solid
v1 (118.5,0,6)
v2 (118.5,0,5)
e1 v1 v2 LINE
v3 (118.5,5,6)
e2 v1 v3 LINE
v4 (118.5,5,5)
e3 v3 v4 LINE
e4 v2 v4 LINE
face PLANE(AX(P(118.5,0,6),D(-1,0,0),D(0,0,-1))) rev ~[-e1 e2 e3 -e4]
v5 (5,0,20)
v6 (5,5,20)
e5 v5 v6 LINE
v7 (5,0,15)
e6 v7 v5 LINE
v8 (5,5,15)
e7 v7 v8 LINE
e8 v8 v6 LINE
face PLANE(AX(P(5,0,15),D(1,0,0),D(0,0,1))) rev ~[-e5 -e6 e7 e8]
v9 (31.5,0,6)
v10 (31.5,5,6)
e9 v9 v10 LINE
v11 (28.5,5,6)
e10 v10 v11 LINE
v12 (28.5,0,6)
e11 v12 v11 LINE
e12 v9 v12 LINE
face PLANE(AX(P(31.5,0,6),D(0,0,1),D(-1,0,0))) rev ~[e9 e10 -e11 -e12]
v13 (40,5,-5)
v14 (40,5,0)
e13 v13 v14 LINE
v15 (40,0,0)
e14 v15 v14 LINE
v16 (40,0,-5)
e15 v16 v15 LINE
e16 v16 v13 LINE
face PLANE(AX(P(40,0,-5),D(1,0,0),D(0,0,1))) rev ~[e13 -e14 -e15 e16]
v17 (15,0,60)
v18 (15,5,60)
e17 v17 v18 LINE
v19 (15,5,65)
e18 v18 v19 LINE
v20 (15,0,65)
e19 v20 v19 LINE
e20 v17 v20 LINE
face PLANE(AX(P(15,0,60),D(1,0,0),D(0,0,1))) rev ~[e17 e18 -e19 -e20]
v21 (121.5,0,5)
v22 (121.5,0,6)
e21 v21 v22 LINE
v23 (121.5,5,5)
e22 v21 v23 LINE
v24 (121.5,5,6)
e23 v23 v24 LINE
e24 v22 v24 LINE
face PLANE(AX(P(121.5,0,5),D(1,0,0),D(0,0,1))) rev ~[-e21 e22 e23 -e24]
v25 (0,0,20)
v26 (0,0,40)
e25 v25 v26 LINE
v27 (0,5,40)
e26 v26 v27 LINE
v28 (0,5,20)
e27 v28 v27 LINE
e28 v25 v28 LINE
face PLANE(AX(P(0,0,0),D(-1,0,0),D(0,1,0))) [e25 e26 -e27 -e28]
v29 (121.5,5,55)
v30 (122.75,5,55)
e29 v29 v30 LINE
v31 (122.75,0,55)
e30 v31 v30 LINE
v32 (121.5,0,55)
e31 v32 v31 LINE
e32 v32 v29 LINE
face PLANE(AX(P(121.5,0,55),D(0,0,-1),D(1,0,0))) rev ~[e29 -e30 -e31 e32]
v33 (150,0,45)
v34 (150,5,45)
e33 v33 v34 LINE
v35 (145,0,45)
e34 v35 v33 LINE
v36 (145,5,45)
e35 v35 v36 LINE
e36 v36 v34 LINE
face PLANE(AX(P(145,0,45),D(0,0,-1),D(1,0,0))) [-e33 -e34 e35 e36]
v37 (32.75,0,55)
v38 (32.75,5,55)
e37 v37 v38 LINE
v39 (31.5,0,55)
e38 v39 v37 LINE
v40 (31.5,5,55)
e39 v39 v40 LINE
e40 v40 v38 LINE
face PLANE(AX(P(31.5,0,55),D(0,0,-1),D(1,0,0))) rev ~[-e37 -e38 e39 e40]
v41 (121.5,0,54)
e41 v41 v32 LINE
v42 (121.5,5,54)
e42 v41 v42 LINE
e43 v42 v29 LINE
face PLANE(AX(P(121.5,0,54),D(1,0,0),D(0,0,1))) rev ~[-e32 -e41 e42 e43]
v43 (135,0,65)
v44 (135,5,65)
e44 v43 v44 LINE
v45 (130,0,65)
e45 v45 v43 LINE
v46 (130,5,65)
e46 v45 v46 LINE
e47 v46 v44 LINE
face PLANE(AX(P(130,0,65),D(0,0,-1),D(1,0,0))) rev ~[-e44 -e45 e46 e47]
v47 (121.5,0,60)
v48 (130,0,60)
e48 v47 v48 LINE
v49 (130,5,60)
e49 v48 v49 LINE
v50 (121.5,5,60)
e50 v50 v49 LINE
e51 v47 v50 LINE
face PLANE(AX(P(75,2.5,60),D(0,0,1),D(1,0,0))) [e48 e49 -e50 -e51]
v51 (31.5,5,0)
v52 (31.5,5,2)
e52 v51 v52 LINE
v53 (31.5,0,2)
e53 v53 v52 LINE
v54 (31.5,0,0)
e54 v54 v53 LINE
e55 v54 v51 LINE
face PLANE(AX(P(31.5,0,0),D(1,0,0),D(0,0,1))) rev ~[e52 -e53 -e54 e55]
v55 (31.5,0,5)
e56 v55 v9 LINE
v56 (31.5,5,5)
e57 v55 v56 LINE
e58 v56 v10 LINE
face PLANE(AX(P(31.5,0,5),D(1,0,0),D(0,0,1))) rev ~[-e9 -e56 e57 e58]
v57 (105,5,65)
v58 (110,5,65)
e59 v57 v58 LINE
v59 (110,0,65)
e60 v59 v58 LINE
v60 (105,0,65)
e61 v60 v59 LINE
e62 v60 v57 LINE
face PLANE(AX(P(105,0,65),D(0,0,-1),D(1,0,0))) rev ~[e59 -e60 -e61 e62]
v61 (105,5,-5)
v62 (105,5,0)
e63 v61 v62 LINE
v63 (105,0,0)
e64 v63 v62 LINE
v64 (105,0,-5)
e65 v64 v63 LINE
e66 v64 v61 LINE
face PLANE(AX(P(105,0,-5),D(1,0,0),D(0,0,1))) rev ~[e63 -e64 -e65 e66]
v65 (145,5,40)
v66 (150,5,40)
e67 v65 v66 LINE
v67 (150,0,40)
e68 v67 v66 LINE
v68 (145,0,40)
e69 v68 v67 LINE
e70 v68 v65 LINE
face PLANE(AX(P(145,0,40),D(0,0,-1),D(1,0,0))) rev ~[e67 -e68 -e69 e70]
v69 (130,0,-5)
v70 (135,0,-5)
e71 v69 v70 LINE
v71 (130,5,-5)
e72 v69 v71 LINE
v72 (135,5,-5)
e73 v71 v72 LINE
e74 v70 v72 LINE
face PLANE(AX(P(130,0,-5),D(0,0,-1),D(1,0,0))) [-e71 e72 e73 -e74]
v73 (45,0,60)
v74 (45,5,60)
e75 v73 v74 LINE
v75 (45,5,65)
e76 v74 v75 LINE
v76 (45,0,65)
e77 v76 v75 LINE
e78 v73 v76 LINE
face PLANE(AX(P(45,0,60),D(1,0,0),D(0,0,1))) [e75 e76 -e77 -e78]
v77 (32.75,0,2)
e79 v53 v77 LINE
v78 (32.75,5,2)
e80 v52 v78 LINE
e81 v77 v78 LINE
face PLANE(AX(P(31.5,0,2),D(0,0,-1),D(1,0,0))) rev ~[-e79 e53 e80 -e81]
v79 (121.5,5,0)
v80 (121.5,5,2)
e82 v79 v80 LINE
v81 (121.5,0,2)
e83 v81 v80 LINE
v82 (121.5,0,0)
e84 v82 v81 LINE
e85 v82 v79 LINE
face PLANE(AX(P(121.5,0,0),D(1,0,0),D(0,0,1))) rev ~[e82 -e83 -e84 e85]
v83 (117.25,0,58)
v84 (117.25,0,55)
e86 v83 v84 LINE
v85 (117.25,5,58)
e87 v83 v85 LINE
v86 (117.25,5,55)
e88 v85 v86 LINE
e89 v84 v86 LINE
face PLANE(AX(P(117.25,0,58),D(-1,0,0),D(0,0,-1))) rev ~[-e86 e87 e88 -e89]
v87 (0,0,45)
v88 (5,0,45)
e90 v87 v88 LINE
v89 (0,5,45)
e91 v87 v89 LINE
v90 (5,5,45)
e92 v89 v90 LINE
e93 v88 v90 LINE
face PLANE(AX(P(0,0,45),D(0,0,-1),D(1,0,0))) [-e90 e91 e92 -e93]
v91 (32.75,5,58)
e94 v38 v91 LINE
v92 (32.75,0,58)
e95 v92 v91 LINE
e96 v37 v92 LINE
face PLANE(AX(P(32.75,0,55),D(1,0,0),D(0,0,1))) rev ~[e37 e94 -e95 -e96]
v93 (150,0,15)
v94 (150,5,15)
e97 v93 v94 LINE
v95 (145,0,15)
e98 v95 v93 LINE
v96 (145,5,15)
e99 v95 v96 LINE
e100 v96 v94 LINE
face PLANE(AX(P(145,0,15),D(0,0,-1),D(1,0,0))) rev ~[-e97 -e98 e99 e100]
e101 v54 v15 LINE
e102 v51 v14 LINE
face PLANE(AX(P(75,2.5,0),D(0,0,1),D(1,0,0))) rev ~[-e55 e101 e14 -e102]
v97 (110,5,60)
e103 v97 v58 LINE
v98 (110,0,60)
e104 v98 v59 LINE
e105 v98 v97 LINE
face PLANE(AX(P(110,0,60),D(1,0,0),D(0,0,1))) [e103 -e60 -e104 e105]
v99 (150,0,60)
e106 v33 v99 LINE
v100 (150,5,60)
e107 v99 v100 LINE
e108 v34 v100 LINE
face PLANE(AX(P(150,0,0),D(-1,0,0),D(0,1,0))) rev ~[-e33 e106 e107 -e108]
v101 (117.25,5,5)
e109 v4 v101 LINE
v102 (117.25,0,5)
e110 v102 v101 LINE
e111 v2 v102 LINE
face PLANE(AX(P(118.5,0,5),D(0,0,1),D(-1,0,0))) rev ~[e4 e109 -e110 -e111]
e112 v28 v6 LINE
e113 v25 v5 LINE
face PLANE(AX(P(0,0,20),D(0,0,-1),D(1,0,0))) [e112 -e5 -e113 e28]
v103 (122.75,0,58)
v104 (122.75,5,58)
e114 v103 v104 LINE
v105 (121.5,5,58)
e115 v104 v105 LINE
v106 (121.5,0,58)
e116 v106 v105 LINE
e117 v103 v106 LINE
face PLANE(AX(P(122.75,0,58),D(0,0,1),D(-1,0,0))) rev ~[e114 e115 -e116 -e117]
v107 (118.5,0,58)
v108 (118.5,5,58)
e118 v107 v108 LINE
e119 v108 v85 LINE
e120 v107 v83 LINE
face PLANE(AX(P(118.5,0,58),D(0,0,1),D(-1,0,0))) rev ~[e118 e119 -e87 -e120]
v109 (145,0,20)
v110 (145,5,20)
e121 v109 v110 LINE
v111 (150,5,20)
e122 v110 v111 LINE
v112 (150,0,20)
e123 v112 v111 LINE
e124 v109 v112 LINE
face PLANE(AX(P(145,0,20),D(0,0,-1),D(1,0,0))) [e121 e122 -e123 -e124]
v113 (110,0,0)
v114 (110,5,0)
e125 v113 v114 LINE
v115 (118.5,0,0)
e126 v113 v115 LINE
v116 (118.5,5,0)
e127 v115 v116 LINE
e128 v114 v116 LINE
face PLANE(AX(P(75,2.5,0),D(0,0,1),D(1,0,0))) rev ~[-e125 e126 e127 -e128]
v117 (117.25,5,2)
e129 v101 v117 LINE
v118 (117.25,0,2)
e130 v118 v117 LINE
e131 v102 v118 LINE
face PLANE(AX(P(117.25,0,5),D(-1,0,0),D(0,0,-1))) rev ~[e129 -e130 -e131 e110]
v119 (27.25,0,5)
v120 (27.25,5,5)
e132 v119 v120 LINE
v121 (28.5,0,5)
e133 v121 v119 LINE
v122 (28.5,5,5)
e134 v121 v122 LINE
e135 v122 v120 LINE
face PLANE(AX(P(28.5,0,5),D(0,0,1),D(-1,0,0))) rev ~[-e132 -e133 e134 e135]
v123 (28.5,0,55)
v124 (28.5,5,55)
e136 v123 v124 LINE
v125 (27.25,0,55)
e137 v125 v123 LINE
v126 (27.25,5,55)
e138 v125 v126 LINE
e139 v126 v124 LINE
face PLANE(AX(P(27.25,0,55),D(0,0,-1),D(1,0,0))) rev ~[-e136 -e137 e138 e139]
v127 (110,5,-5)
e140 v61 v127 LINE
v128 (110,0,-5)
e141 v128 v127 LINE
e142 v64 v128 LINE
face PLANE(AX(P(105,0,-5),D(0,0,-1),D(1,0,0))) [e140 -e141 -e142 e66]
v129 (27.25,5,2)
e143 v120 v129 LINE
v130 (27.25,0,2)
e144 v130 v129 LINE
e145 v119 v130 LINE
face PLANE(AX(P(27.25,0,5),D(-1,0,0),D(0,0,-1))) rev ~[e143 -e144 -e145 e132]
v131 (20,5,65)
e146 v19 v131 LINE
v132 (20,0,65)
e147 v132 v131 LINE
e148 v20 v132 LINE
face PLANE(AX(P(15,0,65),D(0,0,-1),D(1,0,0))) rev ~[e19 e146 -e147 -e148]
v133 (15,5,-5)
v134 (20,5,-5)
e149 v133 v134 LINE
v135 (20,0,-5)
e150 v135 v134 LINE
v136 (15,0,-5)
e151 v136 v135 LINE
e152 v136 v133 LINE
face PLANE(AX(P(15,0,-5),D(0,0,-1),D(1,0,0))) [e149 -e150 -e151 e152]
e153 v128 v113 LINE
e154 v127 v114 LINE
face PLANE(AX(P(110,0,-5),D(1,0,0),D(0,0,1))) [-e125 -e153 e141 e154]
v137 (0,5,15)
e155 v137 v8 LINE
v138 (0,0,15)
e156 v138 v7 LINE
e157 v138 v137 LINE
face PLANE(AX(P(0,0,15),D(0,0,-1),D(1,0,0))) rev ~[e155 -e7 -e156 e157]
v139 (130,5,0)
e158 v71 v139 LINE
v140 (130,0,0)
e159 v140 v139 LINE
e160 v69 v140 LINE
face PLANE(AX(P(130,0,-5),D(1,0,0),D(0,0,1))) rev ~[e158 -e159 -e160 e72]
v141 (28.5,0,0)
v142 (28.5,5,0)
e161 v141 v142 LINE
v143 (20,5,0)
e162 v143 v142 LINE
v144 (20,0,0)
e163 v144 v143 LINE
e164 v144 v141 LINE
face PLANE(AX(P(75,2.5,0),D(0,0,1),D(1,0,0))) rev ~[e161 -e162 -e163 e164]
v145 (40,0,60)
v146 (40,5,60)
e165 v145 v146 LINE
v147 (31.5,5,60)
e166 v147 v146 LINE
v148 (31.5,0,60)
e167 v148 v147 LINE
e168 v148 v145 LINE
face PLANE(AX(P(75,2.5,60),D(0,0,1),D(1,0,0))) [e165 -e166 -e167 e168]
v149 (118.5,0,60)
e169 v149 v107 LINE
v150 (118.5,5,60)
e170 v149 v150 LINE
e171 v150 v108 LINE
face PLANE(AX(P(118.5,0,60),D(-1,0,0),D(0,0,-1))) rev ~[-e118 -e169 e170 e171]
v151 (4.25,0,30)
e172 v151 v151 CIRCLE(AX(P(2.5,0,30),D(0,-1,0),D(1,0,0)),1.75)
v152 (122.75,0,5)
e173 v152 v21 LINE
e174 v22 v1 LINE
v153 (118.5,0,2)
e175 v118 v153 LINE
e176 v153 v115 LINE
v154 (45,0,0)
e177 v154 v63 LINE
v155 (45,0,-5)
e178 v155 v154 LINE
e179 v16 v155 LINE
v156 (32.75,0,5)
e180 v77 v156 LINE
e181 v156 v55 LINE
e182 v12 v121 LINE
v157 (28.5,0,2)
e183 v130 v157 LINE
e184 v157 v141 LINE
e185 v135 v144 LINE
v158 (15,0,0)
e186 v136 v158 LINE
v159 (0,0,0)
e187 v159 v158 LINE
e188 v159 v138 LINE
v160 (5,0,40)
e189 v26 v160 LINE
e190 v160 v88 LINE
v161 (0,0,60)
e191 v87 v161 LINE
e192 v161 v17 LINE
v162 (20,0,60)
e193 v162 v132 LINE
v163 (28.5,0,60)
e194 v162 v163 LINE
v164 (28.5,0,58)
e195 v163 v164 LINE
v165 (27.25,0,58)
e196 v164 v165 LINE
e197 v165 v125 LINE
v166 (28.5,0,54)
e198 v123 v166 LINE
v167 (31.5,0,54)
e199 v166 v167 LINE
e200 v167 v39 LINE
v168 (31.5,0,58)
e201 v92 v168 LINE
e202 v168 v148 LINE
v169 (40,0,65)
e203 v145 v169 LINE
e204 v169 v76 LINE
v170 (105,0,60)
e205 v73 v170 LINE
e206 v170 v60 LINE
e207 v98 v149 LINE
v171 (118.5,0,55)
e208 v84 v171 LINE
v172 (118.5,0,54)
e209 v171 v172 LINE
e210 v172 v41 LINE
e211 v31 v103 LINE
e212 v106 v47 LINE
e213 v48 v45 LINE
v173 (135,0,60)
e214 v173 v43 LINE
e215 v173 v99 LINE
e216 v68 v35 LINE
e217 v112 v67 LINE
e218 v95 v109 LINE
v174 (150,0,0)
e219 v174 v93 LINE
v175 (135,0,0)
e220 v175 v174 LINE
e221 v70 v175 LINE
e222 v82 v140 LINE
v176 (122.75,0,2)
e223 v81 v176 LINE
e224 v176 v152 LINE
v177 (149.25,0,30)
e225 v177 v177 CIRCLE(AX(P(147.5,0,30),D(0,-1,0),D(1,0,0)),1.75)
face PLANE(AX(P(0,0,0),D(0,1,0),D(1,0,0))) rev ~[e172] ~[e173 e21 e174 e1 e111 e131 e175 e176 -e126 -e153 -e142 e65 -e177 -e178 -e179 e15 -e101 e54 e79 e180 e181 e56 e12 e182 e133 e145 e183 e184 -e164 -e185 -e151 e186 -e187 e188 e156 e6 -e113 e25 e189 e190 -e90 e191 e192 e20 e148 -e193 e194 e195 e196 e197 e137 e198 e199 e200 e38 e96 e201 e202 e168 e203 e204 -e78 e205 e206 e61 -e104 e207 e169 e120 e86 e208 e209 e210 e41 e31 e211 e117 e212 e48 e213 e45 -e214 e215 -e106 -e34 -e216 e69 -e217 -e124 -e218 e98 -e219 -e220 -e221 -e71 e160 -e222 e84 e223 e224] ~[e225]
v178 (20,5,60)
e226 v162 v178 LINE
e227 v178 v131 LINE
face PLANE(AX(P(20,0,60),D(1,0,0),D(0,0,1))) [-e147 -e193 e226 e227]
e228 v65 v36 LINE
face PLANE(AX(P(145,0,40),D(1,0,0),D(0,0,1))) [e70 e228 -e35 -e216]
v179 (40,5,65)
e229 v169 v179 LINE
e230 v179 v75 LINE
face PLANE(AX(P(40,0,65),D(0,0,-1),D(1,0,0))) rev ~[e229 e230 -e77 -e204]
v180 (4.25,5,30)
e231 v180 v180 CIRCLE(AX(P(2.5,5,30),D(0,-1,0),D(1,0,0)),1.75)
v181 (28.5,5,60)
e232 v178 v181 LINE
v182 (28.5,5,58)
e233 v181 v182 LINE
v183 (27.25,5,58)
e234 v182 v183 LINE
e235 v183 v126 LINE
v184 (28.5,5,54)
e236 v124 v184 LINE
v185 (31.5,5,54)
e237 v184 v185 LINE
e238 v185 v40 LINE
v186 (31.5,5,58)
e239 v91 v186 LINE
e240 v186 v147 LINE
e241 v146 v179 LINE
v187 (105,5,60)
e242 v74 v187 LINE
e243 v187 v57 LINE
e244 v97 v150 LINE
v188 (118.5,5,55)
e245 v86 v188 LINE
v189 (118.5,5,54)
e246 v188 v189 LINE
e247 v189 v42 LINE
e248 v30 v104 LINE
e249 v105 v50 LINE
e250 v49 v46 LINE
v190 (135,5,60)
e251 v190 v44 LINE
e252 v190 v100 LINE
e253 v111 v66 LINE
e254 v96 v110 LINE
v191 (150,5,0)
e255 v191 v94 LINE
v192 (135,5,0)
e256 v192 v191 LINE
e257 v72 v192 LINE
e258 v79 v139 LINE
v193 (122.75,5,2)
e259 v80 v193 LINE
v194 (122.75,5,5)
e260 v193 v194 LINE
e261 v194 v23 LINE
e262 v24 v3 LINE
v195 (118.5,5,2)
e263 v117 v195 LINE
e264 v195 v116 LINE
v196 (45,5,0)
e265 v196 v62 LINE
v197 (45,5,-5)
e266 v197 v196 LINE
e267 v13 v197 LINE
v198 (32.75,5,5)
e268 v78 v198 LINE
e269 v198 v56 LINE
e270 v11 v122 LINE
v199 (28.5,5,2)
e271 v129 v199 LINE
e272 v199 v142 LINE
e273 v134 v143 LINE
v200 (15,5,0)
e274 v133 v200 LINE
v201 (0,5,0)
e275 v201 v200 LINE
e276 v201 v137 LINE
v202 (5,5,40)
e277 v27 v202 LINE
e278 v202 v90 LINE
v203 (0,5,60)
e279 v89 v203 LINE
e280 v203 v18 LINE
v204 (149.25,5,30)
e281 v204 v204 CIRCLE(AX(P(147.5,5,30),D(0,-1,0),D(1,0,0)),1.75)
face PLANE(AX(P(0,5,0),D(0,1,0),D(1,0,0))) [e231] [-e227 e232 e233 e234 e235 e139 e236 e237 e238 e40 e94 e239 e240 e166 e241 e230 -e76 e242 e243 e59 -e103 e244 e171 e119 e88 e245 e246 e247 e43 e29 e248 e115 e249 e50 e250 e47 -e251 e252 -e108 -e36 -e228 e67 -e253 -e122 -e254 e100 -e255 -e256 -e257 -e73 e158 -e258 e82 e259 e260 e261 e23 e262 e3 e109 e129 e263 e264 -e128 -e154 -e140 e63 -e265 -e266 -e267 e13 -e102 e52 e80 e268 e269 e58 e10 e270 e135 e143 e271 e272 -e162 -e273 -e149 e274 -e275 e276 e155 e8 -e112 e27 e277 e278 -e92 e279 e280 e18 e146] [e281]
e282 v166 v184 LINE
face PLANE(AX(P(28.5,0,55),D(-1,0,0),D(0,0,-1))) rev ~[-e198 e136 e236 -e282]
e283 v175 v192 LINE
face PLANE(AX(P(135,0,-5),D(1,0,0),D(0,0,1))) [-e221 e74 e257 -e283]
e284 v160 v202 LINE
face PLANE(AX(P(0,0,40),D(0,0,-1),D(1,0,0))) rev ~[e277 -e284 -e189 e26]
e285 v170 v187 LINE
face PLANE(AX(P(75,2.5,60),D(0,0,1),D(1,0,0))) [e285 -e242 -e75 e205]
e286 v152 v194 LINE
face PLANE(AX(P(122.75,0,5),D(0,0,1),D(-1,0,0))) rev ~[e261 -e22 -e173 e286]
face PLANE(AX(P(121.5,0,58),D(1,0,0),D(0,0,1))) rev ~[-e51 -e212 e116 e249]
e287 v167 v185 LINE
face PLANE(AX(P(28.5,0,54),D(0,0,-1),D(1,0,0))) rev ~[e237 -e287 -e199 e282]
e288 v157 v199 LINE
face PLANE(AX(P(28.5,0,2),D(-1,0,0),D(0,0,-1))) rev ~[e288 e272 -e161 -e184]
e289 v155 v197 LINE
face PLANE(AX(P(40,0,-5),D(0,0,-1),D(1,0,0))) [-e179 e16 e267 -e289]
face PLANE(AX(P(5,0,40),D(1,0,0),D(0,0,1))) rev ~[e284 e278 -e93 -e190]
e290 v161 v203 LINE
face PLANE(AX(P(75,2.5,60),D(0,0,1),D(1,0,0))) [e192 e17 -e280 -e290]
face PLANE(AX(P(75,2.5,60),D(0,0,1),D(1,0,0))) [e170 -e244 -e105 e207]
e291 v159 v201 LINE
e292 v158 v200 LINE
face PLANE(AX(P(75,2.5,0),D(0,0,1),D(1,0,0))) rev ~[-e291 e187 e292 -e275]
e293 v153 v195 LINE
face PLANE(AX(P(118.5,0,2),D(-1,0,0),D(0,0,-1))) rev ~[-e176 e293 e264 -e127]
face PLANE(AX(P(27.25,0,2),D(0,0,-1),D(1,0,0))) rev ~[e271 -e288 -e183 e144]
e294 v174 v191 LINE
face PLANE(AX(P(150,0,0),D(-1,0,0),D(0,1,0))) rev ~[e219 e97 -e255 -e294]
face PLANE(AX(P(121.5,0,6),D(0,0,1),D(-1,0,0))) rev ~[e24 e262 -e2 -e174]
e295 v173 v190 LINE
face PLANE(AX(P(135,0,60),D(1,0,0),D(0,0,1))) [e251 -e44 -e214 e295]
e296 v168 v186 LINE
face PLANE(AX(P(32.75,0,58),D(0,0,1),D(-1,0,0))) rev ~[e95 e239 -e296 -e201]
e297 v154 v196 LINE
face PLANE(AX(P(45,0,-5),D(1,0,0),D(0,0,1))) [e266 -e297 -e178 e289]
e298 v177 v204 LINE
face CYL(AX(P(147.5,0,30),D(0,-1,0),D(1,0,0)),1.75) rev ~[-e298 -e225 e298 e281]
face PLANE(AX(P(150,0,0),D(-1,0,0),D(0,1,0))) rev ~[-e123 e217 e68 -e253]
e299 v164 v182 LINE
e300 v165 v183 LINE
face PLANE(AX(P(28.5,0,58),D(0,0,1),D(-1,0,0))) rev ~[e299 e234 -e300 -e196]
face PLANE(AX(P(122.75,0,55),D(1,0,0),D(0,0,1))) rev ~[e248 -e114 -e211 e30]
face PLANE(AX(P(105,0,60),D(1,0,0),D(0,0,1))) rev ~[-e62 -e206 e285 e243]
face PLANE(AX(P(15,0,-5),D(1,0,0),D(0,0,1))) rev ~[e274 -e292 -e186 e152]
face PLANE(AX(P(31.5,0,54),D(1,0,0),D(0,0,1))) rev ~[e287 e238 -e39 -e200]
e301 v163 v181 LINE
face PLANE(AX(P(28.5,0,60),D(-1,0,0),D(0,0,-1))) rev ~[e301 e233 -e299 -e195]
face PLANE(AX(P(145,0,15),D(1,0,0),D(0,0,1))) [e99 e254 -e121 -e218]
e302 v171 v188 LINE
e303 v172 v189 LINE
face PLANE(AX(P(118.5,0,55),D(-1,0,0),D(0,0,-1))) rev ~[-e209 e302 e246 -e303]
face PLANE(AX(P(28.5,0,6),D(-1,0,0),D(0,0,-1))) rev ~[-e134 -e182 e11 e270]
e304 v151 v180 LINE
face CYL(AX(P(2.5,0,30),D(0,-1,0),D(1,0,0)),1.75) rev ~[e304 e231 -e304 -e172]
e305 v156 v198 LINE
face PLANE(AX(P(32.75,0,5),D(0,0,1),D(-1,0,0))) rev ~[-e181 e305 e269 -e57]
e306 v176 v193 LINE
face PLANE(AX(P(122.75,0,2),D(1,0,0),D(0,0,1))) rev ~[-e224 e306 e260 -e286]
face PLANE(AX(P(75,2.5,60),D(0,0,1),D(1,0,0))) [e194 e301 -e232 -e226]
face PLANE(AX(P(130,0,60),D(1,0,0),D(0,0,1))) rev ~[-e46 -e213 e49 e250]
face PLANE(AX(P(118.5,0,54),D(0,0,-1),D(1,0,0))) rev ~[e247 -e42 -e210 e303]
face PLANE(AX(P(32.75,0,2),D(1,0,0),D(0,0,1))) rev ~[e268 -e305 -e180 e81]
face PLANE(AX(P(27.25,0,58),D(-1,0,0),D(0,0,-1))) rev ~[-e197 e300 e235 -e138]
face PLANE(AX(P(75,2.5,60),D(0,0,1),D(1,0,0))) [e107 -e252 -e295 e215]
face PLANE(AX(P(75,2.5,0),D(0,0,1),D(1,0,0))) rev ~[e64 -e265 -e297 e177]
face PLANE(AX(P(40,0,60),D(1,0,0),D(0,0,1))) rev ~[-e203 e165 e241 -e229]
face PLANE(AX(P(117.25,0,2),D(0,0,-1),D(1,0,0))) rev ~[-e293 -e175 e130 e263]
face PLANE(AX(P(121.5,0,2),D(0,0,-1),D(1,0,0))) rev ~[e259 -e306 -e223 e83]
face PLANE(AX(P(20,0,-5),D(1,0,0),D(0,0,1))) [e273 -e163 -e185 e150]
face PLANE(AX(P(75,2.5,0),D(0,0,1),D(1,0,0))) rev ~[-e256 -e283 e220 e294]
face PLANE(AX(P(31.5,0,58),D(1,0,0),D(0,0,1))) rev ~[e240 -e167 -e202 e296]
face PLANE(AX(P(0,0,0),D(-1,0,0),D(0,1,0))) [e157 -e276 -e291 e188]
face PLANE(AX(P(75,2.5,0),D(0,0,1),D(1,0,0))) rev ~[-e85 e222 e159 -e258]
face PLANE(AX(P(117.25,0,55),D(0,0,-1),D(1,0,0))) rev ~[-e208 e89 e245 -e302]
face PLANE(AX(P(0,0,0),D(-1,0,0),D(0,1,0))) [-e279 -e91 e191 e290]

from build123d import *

# Parameters (mm, degrees)
F0_W     = 150
F0_H     = 5
F1_DEPTH = 60
F2_W     = 5
F2_H     = 5
F3_DEPTH = 5
F4_R     = 1.75
F4_W     = 5
F4_H     = 5
F5_DEPTH = 5


with BuildPart() as f1:
    # F0 (on Top) → F1 (new body)
    with BuildSketch(Plane.XY):
        with Locations((75, 2.5)):
            Rectangle(F0_W, F0_H)
    extrude(amount=F1_DEPTH)

    # F2 (on face) → F3 (join, through all)
    with BuildSketch(Plane.XZ):
        with Locations((17.5, -2.5)):
            Rectangle(F2_W, F2_H)
        with Locations((42.5, -2.5)):
            Rectangle(F2_W, F2_H)
        with Locations((107.5, -2.5)):
            Rectangle(F2_W, F2_H)
        with Locations((132.5, -2.5)):
            Rectangle(F2_W, F2_H)
        with Locations((42.5, 62.5)):
            Rectangle(F2_W, F2_H)
        with Locations((17.5, 62.5)):
            Rectangle(F2_W, F2_H)
        with Locations((132.5, 62.5)):
            Rectangle(F2_W, F2_H)
        with Locations((107.5, 62.5)):
            Rectangle(F2_W, F2_H)
    extrude(amount=-F3_DEPTH)

    # F4 (on face) → F5 (cut, through all)
    with BuildSketch(Plane.XZ):
        Polygon((28.5, 2), (28.5, 0), (31.5, 0), (31.5, 2), (32.75, 2), (32.75, 5), (31.5, 5), (31.5, 6), (28.5, 6), (28.5, 5), (27.25, 5), (27.25, 2), align=None)
        Polygon((118.5, 6), (118.5, 5), (117.25, 5), (117.25, 2), (118.5, 2), (118.5, 0), (121.5, 0), (121.5, 2), (122.75, 2), (122.75, 5), (121.5, 5), (121.5, 6), align=None)
        Polygon((121.5, 55), (122.75, 55), (122.75, 58), (121.5, 58), (121.5, 60), (118.5, 60), (118.5, 58), (117.25, 58), (117.25, 55), (118.5, 55), (118.5, 54), (121.5, 54), align=None)
        Polygon((31.5, 54), (31.5, 55), (32.75, 55), (32.75, 58), (31.5, 58), (31.5, 60), (28.5, 60), (28.5, 58), (27.25, 58), (27.25, 55), (28.5, 55), (28.5, 54), align=None)
        with Locations((2.5, 30)):
            Circle(F4_R)
        with Locations((2.5, 42.5)):
            Rectangle(F4_W, F4_H)
        with Locations((2.5, 17.5)):
            Rectangle(F4_W, F4_H)
        with Locations((147.5, 42.5)):
            Rectangle(F4_W, F4_H)
        with Locations((147.5, 30)):
            Circle(F4_R)
        with Locations((147.5, 17.5)):
            Rectangle(F4_W, F4_H)
    extrude(amount=-F5_DEPTH, mode=Mode.SUBTRACT)


solid = f1.part
